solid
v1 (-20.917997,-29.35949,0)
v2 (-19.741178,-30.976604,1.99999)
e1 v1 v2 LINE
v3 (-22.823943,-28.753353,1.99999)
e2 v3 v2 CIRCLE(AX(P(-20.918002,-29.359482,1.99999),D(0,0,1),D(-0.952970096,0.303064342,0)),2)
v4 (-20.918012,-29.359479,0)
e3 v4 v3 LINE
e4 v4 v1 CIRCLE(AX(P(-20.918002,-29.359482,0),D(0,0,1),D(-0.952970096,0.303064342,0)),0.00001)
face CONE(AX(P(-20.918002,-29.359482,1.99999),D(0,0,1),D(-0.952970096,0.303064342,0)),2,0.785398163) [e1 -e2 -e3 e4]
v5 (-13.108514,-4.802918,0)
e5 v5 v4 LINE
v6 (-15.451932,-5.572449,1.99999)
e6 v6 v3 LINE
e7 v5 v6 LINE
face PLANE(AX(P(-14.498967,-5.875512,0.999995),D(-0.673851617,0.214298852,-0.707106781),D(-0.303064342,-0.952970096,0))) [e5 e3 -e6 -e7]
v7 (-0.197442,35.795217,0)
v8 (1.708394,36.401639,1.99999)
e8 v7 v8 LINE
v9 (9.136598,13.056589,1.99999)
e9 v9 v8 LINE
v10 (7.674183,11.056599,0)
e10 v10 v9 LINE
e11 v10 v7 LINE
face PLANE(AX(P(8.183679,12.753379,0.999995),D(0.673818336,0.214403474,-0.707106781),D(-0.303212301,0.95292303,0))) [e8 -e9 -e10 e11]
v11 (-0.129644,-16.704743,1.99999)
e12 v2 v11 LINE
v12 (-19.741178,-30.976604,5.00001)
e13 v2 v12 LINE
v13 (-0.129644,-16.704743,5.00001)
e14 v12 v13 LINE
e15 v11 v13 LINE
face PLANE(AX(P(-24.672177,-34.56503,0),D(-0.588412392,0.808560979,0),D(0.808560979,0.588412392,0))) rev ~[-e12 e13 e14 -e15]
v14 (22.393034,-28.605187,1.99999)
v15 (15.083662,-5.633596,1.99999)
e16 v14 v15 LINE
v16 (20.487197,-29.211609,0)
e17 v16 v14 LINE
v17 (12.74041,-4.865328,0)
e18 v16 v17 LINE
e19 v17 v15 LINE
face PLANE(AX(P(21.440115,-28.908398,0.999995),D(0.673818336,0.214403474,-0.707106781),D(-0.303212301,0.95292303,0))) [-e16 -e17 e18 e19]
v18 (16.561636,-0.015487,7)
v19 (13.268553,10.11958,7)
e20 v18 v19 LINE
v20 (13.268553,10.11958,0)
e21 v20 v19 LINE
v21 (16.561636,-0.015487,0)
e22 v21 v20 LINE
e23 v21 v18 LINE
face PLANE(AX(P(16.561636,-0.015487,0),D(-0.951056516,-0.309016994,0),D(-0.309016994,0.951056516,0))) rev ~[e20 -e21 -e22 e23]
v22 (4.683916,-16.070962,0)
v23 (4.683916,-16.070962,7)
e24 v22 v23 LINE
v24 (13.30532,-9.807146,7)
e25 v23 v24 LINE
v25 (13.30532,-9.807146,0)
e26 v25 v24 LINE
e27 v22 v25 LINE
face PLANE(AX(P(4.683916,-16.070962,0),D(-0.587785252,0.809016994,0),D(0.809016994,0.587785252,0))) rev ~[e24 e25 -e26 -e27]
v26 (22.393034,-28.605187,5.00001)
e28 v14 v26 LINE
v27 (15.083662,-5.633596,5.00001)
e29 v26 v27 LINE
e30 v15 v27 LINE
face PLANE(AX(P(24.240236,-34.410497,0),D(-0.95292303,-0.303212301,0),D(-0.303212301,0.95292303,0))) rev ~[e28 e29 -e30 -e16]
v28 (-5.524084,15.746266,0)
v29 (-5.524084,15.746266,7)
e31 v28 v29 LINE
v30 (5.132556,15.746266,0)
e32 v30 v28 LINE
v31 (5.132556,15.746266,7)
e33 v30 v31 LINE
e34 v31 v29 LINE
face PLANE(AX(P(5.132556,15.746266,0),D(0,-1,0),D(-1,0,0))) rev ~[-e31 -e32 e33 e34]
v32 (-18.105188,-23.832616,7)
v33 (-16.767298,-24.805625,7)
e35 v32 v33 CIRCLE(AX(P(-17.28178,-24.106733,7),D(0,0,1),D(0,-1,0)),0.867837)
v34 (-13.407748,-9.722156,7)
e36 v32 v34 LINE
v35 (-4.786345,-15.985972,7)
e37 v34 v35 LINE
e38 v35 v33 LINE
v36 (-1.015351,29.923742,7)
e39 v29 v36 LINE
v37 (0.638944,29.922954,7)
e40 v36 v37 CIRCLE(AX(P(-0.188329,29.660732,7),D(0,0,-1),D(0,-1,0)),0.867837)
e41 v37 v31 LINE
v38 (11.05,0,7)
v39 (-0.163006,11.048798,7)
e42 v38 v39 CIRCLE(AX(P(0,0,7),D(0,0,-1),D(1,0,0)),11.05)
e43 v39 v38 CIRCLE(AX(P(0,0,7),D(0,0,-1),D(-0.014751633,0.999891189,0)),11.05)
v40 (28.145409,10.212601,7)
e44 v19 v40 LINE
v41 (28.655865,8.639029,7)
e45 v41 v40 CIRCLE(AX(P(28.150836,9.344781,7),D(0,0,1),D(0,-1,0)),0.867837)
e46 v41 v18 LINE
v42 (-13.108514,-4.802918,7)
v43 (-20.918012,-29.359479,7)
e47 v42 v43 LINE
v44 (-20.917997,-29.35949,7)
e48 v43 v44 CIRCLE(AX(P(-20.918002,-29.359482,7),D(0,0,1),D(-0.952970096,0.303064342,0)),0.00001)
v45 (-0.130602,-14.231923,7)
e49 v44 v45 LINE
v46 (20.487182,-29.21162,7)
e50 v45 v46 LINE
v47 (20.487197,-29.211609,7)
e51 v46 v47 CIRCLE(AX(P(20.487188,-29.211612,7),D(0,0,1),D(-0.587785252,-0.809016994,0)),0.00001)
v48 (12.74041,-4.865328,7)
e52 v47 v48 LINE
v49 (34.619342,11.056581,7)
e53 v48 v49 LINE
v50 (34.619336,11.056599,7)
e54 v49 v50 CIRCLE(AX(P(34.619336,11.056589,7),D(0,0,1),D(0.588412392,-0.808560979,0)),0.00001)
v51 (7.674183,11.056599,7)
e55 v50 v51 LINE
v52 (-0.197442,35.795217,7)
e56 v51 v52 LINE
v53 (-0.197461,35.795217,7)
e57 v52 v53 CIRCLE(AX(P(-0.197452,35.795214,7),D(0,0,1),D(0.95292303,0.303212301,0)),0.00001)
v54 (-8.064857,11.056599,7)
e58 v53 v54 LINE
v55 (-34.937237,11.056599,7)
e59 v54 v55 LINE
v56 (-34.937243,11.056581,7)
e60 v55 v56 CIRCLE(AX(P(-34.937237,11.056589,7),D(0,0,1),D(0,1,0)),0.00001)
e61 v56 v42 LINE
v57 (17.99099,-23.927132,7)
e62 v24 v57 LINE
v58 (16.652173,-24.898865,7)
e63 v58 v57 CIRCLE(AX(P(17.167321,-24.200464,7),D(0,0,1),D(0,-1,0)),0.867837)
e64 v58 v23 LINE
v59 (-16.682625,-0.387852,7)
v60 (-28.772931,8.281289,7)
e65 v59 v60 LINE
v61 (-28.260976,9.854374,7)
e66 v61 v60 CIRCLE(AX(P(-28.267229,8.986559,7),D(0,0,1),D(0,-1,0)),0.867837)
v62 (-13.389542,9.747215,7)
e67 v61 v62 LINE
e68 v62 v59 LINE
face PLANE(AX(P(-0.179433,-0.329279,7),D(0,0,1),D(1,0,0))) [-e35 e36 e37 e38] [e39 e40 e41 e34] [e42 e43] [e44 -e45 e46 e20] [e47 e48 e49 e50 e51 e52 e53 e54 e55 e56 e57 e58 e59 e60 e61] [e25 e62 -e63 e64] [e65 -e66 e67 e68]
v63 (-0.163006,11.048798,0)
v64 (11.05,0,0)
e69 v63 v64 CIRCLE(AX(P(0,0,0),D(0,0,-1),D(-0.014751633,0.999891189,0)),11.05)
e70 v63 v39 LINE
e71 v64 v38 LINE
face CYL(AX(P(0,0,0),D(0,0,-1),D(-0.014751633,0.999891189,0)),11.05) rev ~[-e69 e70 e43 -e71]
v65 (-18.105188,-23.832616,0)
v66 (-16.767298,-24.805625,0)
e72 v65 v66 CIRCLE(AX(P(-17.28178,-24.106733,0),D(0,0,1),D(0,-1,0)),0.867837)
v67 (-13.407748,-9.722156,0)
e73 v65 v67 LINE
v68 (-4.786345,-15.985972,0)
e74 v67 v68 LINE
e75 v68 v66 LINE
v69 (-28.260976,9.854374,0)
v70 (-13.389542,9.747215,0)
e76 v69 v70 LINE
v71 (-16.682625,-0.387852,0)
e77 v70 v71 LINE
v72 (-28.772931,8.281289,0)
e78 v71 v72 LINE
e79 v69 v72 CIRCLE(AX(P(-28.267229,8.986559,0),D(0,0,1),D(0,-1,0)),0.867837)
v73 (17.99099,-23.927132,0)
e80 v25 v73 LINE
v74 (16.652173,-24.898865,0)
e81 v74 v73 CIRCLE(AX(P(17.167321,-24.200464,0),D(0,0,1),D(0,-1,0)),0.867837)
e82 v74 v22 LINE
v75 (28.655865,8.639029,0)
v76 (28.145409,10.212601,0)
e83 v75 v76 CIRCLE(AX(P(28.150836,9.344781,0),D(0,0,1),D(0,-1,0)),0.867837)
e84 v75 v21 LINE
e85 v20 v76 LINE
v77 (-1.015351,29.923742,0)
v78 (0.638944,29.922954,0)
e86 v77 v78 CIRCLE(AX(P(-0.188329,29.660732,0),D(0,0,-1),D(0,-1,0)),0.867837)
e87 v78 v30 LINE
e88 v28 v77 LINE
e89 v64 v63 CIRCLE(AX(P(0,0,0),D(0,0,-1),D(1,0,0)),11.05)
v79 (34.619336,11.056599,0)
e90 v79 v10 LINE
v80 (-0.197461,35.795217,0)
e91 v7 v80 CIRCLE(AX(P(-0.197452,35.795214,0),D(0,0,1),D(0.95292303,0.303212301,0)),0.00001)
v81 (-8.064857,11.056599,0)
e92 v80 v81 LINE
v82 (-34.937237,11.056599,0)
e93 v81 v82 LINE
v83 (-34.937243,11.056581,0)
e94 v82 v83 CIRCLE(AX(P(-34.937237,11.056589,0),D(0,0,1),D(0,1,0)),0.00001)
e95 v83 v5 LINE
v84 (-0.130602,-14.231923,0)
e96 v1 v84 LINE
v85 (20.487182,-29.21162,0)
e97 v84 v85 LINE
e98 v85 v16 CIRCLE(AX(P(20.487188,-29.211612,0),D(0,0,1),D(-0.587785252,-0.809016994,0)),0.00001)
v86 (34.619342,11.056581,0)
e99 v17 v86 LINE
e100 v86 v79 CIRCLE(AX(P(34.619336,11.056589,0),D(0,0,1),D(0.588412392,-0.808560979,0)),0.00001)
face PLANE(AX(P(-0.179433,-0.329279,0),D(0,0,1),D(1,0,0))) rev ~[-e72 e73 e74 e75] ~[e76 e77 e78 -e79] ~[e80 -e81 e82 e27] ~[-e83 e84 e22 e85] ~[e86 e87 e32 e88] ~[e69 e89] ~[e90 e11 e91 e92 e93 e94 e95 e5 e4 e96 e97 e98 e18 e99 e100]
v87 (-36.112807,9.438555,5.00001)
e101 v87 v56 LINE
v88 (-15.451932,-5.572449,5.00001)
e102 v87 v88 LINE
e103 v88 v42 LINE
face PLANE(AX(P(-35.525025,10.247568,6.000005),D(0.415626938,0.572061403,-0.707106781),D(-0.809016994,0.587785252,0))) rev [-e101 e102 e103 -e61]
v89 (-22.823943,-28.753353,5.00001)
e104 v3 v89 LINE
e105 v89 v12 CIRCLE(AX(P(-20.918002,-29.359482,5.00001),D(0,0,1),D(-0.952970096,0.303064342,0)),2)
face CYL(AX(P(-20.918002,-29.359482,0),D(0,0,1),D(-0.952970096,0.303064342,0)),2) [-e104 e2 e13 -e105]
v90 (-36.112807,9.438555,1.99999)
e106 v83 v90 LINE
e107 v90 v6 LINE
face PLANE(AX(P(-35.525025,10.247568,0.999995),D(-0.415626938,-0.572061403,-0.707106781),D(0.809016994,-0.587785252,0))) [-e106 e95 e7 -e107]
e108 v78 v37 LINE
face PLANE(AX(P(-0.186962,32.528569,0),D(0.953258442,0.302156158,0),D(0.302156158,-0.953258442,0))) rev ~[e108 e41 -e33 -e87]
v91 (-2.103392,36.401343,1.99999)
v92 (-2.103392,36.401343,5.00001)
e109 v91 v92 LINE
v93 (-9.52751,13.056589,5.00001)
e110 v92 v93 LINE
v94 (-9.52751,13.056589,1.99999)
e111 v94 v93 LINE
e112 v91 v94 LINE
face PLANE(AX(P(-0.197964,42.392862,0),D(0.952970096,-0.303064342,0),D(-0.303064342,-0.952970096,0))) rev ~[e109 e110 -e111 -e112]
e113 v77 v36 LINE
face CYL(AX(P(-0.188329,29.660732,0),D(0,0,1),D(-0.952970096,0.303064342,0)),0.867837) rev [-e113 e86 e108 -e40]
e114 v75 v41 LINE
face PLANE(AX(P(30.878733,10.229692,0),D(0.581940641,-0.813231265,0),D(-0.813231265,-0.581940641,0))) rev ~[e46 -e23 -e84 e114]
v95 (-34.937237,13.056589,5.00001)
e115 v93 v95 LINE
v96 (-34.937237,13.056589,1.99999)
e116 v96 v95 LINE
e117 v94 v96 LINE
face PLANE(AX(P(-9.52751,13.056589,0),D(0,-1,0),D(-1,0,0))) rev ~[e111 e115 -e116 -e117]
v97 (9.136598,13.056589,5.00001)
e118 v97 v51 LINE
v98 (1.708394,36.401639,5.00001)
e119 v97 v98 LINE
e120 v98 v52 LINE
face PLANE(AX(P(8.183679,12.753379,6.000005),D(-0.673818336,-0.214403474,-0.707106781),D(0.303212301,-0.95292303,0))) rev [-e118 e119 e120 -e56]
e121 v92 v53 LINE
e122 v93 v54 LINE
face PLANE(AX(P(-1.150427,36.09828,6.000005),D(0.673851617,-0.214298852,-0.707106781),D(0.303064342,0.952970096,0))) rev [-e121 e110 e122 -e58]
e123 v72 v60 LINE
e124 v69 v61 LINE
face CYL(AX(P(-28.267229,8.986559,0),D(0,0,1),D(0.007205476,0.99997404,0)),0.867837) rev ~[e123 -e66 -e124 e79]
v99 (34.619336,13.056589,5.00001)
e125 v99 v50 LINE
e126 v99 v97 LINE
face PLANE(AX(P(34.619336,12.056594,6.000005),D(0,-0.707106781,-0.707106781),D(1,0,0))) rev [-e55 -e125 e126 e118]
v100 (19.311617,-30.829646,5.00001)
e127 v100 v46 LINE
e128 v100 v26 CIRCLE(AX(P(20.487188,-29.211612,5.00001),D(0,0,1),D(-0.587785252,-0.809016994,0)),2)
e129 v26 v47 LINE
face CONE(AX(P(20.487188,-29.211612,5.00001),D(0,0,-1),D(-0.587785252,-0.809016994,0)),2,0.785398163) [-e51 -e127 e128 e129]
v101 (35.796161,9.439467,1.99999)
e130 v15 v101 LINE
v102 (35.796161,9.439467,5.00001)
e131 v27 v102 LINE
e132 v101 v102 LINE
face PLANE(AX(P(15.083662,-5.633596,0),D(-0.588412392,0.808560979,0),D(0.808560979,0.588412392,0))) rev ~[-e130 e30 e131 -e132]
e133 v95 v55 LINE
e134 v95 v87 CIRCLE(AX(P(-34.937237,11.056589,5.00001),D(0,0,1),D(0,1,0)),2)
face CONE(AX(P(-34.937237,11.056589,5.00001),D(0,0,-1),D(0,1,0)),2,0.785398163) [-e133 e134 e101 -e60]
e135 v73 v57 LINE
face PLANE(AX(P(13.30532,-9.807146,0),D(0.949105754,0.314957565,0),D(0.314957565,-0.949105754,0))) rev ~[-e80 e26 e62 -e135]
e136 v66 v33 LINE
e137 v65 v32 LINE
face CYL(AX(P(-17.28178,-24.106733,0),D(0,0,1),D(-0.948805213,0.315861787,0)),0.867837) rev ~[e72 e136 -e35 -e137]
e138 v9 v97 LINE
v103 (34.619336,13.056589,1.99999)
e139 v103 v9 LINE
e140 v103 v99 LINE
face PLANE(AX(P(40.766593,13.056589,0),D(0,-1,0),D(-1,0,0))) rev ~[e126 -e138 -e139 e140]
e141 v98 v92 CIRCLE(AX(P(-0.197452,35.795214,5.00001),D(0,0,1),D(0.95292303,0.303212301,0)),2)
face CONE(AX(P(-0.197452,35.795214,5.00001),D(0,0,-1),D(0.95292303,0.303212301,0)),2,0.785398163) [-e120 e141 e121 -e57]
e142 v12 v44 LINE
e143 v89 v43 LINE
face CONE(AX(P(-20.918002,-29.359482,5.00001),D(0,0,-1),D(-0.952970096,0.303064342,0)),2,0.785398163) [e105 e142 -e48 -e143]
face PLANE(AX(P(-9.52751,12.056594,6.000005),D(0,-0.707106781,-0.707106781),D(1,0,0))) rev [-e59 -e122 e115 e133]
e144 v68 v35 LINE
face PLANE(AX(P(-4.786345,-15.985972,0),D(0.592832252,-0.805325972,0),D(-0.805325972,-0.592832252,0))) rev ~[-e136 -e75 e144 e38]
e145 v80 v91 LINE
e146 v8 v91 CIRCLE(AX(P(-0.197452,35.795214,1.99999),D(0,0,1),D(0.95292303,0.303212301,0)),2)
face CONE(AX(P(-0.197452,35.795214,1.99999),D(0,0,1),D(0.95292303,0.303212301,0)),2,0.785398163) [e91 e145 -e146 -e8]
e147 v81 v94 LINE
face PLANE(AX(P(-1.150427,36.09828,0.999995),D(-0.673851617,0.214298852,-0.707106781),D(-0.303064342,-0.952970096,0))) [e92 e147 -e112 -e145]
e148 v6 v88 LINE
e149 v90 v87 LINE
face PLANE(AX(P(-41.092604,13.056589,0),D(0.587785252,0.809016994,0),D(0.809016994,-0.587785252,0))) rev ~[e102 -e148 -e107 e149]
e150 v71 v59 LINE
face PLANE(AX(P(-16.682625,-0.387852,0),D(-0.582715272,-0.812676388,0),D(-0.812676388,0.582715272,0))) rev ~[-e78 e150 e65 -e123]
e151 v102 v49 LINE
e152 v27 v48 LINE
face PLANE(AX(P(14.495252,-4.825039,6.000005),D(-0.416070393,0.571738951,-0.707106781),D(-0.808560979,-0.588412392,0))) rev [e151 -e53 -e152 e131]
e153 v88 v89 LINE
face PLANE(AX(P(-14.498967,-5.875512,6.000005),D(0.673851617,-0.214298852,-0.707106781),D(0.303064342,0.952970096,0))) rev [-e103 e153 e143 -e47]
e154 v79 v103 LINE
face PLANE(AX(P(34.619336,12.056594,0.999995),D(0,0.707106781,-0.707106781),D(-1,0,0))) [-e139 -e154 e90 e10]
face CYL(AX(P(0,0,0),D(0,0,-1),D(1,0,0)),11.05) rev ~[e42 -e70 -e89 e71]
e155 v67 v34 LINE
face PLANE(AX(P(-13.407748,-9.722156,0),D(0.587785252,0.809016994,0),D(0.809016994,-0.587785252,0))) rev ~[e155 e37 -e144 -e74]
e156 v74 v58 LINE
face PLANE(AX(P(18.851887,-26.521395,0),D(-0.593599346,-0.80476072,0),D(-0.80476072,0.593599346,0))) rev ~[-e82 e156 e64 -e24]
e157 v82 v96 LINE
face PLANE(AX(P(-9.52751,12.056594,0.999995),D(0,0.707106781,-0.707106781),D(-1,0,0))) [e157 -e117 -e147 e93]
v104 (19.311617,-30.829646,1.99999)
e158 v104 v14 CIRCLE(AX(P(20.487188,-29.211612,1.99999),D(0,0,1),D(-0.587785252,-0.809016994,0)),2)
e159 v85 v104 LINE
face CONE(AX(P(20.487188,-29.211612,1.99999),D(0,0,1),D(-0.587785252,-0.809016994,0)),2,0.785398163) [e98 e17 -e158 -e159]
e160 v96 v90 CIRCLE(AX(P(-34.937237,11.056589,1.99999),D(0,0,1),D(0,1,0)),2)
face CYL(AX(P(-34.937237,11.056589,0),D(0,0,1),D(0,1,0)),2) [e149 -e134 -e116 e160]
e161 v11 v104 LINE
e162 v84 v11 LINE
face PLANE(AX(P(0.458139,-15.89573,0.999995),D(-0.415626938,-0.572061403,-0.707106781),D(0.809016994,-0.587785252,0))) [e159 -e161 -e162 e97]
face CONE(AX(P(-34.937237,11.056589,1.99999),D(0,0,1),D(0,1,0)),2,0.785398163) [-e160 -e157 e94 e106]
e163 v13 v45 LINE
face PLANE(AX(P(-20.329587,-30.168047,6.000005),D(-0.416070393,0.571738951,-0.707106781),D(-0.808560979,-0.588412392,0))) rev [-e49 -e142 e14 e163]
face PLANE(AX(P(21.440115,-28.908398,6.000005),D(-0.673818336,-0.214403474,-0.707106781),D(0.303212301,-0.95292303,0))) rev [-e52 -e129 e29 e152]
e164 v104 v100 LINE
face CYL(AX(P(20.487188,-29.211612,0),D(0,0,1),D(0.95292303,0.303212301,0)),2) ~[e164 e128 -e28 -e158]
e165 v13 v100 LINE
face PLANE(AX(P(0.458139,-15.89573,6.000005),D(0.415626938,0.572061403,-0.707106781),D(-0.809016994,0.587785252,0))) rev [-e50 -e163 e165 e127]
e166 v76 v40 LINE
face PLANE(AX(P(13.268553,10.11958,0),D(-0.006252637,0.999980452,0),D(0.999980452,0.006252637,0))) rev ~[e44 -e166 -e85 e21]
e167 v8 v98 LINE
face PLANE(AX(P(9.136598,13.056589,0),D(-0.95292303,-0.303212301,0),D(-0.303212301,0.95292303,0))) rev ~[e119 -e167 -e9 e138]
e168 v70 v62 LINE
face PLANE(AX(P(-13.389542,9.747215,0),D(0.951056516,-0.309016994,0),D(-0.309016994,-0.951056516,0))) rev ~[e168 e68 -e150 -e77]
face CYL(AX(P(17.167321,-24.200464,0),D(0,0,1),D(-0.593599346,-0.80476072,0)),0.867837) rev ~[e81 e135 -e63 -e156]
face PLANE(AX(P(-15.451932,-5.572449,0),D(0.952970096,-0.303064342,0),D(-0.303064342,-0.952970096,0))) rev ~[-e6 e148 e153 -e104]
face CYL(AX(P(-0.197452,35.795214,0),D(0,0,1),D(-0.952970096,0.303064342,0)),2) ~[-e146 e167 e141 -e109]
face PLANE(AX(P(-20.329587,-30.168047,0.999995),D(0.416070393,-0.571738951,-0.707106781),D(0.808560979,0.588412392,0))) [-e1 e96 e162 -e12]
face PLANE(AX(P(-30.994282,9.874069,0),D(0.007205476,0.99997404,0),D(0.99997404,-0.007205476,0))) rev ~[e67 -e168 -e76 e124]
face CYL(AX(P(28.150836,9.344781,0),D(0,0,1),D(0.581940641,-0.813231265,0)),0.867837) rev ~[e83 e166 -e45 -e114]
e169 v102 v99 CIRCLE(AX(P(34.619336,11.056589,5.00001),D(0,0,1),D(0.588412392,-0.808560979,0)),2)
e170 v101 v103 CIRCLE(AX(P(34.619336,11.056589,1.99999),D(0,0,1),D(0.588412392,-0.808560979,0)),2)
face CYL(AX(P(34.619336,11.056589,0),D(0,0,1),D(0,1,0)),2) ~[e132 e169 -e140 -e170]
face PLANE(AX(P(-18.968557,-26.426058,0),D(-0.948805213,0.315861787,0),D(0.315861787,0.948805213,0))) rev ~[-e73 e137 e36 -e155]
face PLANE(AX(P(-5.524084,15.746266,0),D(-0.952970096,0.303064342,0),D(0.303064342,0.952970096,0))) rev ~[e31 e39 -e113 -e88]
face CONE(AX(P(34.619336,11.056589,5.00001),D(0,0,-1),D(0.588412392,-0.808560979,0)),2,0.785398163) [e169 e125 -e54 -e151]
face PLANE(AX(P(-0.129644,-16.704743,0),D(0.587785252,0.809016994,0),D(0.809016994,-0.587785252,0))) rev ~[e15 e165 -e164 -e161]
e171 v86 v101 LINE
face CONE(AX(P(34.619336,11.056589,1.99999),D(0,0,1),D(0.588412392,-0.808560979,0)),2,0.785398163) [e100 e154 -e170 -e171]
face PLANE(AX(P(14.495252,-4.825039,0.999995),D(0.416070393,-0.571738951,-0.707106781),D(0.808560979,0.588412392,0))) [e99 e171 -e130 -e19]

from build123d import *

# Parameters (mm, degrees)
F1_DEPTH = 7
F2_R     = 2
F3_R     = 0.8678369572
F4_SIZE  = 1.99999
F5_SIZE  = 1.99999


# Not quite as in the source:
# - a fillet or chamfer is up to 0.001 mm smaller than in the source, because OpenCascade refuses the exact size


with BuildPart() as f1:
    # F0 (on Top) → F1 (new body)
    with BuildSketch(Plane.XY):
        Polygon((9.1365975469, 13.0565894232), (-0.1652448664, 13.0565894232), (-9.5275098884, 13.0565894232), (-15.4519321666, -5.5724489729), (-0.1296436349, -16.7047432175), (15.0836615604, -5.6335964123), align=None)
        with BuildLine():
            ThreePointArc((-0.1630055447, 11.0487976356), (7.7556846484, 7.87095011), (11.05, 0))
            ThreePointArc((11.05, 0), (-7.7556846484, -7.87095011), (-0.1630055447, 11.0487976356))
        make_face(mode=Mode.SUBTRACT)
        Polygon((-9.5275098884, 13.0565894232), (-0.1652448664, 13.0565894232), (-0.1682447051, 15.7462661459), (-5.5240840498, 15.7462661459), (-0.1869622706, 32.5285686018), (-0.1979640721, 42.3928620705), align=None)
        Polygon((-0.1682447051, 15.7462661459), (-0.1652448664, 13.0565894232), (9.1365975469, 13.0565894232), (-0.1979640721, 42.3928620705), (-0.1869622706, 32.5285686018), (5.1325563495, 15.7462661459), align=None)
        Polygon((-15.4519321666, -5.5724489729), (-9.5275098884, 13.0565894232), (-41.0926038108, 13.0565894232), align=None)
        Polygon((-16.6826248751, -0.3878522951), (-30.9942816534, 9.8740688149), (-13.3895418888, 9.7472149984), align=None, mode=Mode.SUBTRACT)
        Polygon((40.7665927214, 13.0565894232), (9.1365975469, 13.0565894232), (15.0836615604, -5.6335964123), align=None)
        Polygon((13.2685531756, 10.1195799691), (30.8787326155, 10.2296921864), (16.561636162, -0.0154873244), align=None, mode=Mode.SUBTRACT)
        Polygon((-0.1296436349, -16.7047432175), (-15.4519321666, -5.5724489729), (-24.67217675, -34.5650295656), align=None)
        Polygon((-4.7863451446, -15.9859720469), (-18.9685572481, -26.4260584669), (-13.4077483305, -9.7221559812), align=None, mode=Mode.SUBTRACT)
        Polygon((24.2402355164, -34.4104968233), (15.0836615604, -5.6335964123), (-0.1296436349, -16.7047432175), align=None)
        Polygon((13.3053196858, -9.8071458261), (18.8518873485, -26.5213951891), (4.6839164999, -16.0709618918), align=None, mode=Mode.SUBTRACT)
    extrude(amount=F1_DEPTH)

    # F2
    f2_edges = [f1.edges().sort_by_distance(p)[0] for p in [
        (-0.197964, 42.392862, 3.5),
        (40.766593, 13.056589, 3.5),
        (24.240236, -34.410497, 3.5),
        (-24.672177, -34.56503, 3.5),
        (-41.092604, 13.056589, 3.5),
    ]]
    fillet(f2_edges, radius=F2_R)

    # F3
    f3_edges = [f1.edges().sort_by_distance(p)[0] for p in [
        (-18.968557, -26.426058, 3.5),
        (-30.994282, 9.874069, 3.5),
        (18.851887, -26.521395, 3.5),
        (30.878733, 10.229692, 3.5),
        (-0.186962, 32.528569, 3.5),
    ]]
    fillet(f3_edges, radius=F3_R)

    # F4 (size 2 in the source; OpenCascade refuses exactly that, so slightly less here)
    f4_edges = [f1.edges().sort_by_distance(p)[0] for p in [
        (-22.232373, 13.056589, 7),
        (-5.815451, 24.728966, 7),
        (-0.197607, 37.795214, 7),
        (5.422496, 24.729114, 7),
        (21.877967, 13.056589, 7),
        (36.521209, 11.675361, 7),
        (25.439911, 1.902936, 7),
        (18.738348, -17.119392, 7),
        (21.65782, -30.833222, 7),
        (9.590987, -23.767195, 7),
        (-9.935411, -23.840674, 7),
        (-19.137937, -17.162901, 7),
        (-25.78237, 1.933053, 7),
        (-36.83935, 11.674623, 7),
    ]]
    chamfer(f4_edges, length=F4_SIZE)

    # F5 (size 2 in the source; OpenCascade refuses exactly that, so slightly less here)
    f5_edges = [f1.edges().sort_by_distance(p)[0] for p in [
        (21.877967, 13.056589, 0),
        (5.422496, 24.729114, 0),
        (-5.815451, 24.728966, 0),
        (-22.232373, 13.056589, 0),
        (-25.78237, 1.933053, 0),
        (-19.137937, -17.162901, 0),
        (-9.935411, -23.840674, 0),
        (9.590987, -23.767195, 0),
        (25.439911, 1.902936, 0),
        (18.738348, -17.119392, 0),
        (-36.83935, 11.674623, 0),
        (-0.197607, 37.795214, 0),
        (36.521209, 11.675361, 0),
        (21.65782, -30.833222, 0),
        (-22.08788, -30.981637, 0),
    ]]
    chamfer(f5_edges, length=F5_SIZE)


solid = f1.part
